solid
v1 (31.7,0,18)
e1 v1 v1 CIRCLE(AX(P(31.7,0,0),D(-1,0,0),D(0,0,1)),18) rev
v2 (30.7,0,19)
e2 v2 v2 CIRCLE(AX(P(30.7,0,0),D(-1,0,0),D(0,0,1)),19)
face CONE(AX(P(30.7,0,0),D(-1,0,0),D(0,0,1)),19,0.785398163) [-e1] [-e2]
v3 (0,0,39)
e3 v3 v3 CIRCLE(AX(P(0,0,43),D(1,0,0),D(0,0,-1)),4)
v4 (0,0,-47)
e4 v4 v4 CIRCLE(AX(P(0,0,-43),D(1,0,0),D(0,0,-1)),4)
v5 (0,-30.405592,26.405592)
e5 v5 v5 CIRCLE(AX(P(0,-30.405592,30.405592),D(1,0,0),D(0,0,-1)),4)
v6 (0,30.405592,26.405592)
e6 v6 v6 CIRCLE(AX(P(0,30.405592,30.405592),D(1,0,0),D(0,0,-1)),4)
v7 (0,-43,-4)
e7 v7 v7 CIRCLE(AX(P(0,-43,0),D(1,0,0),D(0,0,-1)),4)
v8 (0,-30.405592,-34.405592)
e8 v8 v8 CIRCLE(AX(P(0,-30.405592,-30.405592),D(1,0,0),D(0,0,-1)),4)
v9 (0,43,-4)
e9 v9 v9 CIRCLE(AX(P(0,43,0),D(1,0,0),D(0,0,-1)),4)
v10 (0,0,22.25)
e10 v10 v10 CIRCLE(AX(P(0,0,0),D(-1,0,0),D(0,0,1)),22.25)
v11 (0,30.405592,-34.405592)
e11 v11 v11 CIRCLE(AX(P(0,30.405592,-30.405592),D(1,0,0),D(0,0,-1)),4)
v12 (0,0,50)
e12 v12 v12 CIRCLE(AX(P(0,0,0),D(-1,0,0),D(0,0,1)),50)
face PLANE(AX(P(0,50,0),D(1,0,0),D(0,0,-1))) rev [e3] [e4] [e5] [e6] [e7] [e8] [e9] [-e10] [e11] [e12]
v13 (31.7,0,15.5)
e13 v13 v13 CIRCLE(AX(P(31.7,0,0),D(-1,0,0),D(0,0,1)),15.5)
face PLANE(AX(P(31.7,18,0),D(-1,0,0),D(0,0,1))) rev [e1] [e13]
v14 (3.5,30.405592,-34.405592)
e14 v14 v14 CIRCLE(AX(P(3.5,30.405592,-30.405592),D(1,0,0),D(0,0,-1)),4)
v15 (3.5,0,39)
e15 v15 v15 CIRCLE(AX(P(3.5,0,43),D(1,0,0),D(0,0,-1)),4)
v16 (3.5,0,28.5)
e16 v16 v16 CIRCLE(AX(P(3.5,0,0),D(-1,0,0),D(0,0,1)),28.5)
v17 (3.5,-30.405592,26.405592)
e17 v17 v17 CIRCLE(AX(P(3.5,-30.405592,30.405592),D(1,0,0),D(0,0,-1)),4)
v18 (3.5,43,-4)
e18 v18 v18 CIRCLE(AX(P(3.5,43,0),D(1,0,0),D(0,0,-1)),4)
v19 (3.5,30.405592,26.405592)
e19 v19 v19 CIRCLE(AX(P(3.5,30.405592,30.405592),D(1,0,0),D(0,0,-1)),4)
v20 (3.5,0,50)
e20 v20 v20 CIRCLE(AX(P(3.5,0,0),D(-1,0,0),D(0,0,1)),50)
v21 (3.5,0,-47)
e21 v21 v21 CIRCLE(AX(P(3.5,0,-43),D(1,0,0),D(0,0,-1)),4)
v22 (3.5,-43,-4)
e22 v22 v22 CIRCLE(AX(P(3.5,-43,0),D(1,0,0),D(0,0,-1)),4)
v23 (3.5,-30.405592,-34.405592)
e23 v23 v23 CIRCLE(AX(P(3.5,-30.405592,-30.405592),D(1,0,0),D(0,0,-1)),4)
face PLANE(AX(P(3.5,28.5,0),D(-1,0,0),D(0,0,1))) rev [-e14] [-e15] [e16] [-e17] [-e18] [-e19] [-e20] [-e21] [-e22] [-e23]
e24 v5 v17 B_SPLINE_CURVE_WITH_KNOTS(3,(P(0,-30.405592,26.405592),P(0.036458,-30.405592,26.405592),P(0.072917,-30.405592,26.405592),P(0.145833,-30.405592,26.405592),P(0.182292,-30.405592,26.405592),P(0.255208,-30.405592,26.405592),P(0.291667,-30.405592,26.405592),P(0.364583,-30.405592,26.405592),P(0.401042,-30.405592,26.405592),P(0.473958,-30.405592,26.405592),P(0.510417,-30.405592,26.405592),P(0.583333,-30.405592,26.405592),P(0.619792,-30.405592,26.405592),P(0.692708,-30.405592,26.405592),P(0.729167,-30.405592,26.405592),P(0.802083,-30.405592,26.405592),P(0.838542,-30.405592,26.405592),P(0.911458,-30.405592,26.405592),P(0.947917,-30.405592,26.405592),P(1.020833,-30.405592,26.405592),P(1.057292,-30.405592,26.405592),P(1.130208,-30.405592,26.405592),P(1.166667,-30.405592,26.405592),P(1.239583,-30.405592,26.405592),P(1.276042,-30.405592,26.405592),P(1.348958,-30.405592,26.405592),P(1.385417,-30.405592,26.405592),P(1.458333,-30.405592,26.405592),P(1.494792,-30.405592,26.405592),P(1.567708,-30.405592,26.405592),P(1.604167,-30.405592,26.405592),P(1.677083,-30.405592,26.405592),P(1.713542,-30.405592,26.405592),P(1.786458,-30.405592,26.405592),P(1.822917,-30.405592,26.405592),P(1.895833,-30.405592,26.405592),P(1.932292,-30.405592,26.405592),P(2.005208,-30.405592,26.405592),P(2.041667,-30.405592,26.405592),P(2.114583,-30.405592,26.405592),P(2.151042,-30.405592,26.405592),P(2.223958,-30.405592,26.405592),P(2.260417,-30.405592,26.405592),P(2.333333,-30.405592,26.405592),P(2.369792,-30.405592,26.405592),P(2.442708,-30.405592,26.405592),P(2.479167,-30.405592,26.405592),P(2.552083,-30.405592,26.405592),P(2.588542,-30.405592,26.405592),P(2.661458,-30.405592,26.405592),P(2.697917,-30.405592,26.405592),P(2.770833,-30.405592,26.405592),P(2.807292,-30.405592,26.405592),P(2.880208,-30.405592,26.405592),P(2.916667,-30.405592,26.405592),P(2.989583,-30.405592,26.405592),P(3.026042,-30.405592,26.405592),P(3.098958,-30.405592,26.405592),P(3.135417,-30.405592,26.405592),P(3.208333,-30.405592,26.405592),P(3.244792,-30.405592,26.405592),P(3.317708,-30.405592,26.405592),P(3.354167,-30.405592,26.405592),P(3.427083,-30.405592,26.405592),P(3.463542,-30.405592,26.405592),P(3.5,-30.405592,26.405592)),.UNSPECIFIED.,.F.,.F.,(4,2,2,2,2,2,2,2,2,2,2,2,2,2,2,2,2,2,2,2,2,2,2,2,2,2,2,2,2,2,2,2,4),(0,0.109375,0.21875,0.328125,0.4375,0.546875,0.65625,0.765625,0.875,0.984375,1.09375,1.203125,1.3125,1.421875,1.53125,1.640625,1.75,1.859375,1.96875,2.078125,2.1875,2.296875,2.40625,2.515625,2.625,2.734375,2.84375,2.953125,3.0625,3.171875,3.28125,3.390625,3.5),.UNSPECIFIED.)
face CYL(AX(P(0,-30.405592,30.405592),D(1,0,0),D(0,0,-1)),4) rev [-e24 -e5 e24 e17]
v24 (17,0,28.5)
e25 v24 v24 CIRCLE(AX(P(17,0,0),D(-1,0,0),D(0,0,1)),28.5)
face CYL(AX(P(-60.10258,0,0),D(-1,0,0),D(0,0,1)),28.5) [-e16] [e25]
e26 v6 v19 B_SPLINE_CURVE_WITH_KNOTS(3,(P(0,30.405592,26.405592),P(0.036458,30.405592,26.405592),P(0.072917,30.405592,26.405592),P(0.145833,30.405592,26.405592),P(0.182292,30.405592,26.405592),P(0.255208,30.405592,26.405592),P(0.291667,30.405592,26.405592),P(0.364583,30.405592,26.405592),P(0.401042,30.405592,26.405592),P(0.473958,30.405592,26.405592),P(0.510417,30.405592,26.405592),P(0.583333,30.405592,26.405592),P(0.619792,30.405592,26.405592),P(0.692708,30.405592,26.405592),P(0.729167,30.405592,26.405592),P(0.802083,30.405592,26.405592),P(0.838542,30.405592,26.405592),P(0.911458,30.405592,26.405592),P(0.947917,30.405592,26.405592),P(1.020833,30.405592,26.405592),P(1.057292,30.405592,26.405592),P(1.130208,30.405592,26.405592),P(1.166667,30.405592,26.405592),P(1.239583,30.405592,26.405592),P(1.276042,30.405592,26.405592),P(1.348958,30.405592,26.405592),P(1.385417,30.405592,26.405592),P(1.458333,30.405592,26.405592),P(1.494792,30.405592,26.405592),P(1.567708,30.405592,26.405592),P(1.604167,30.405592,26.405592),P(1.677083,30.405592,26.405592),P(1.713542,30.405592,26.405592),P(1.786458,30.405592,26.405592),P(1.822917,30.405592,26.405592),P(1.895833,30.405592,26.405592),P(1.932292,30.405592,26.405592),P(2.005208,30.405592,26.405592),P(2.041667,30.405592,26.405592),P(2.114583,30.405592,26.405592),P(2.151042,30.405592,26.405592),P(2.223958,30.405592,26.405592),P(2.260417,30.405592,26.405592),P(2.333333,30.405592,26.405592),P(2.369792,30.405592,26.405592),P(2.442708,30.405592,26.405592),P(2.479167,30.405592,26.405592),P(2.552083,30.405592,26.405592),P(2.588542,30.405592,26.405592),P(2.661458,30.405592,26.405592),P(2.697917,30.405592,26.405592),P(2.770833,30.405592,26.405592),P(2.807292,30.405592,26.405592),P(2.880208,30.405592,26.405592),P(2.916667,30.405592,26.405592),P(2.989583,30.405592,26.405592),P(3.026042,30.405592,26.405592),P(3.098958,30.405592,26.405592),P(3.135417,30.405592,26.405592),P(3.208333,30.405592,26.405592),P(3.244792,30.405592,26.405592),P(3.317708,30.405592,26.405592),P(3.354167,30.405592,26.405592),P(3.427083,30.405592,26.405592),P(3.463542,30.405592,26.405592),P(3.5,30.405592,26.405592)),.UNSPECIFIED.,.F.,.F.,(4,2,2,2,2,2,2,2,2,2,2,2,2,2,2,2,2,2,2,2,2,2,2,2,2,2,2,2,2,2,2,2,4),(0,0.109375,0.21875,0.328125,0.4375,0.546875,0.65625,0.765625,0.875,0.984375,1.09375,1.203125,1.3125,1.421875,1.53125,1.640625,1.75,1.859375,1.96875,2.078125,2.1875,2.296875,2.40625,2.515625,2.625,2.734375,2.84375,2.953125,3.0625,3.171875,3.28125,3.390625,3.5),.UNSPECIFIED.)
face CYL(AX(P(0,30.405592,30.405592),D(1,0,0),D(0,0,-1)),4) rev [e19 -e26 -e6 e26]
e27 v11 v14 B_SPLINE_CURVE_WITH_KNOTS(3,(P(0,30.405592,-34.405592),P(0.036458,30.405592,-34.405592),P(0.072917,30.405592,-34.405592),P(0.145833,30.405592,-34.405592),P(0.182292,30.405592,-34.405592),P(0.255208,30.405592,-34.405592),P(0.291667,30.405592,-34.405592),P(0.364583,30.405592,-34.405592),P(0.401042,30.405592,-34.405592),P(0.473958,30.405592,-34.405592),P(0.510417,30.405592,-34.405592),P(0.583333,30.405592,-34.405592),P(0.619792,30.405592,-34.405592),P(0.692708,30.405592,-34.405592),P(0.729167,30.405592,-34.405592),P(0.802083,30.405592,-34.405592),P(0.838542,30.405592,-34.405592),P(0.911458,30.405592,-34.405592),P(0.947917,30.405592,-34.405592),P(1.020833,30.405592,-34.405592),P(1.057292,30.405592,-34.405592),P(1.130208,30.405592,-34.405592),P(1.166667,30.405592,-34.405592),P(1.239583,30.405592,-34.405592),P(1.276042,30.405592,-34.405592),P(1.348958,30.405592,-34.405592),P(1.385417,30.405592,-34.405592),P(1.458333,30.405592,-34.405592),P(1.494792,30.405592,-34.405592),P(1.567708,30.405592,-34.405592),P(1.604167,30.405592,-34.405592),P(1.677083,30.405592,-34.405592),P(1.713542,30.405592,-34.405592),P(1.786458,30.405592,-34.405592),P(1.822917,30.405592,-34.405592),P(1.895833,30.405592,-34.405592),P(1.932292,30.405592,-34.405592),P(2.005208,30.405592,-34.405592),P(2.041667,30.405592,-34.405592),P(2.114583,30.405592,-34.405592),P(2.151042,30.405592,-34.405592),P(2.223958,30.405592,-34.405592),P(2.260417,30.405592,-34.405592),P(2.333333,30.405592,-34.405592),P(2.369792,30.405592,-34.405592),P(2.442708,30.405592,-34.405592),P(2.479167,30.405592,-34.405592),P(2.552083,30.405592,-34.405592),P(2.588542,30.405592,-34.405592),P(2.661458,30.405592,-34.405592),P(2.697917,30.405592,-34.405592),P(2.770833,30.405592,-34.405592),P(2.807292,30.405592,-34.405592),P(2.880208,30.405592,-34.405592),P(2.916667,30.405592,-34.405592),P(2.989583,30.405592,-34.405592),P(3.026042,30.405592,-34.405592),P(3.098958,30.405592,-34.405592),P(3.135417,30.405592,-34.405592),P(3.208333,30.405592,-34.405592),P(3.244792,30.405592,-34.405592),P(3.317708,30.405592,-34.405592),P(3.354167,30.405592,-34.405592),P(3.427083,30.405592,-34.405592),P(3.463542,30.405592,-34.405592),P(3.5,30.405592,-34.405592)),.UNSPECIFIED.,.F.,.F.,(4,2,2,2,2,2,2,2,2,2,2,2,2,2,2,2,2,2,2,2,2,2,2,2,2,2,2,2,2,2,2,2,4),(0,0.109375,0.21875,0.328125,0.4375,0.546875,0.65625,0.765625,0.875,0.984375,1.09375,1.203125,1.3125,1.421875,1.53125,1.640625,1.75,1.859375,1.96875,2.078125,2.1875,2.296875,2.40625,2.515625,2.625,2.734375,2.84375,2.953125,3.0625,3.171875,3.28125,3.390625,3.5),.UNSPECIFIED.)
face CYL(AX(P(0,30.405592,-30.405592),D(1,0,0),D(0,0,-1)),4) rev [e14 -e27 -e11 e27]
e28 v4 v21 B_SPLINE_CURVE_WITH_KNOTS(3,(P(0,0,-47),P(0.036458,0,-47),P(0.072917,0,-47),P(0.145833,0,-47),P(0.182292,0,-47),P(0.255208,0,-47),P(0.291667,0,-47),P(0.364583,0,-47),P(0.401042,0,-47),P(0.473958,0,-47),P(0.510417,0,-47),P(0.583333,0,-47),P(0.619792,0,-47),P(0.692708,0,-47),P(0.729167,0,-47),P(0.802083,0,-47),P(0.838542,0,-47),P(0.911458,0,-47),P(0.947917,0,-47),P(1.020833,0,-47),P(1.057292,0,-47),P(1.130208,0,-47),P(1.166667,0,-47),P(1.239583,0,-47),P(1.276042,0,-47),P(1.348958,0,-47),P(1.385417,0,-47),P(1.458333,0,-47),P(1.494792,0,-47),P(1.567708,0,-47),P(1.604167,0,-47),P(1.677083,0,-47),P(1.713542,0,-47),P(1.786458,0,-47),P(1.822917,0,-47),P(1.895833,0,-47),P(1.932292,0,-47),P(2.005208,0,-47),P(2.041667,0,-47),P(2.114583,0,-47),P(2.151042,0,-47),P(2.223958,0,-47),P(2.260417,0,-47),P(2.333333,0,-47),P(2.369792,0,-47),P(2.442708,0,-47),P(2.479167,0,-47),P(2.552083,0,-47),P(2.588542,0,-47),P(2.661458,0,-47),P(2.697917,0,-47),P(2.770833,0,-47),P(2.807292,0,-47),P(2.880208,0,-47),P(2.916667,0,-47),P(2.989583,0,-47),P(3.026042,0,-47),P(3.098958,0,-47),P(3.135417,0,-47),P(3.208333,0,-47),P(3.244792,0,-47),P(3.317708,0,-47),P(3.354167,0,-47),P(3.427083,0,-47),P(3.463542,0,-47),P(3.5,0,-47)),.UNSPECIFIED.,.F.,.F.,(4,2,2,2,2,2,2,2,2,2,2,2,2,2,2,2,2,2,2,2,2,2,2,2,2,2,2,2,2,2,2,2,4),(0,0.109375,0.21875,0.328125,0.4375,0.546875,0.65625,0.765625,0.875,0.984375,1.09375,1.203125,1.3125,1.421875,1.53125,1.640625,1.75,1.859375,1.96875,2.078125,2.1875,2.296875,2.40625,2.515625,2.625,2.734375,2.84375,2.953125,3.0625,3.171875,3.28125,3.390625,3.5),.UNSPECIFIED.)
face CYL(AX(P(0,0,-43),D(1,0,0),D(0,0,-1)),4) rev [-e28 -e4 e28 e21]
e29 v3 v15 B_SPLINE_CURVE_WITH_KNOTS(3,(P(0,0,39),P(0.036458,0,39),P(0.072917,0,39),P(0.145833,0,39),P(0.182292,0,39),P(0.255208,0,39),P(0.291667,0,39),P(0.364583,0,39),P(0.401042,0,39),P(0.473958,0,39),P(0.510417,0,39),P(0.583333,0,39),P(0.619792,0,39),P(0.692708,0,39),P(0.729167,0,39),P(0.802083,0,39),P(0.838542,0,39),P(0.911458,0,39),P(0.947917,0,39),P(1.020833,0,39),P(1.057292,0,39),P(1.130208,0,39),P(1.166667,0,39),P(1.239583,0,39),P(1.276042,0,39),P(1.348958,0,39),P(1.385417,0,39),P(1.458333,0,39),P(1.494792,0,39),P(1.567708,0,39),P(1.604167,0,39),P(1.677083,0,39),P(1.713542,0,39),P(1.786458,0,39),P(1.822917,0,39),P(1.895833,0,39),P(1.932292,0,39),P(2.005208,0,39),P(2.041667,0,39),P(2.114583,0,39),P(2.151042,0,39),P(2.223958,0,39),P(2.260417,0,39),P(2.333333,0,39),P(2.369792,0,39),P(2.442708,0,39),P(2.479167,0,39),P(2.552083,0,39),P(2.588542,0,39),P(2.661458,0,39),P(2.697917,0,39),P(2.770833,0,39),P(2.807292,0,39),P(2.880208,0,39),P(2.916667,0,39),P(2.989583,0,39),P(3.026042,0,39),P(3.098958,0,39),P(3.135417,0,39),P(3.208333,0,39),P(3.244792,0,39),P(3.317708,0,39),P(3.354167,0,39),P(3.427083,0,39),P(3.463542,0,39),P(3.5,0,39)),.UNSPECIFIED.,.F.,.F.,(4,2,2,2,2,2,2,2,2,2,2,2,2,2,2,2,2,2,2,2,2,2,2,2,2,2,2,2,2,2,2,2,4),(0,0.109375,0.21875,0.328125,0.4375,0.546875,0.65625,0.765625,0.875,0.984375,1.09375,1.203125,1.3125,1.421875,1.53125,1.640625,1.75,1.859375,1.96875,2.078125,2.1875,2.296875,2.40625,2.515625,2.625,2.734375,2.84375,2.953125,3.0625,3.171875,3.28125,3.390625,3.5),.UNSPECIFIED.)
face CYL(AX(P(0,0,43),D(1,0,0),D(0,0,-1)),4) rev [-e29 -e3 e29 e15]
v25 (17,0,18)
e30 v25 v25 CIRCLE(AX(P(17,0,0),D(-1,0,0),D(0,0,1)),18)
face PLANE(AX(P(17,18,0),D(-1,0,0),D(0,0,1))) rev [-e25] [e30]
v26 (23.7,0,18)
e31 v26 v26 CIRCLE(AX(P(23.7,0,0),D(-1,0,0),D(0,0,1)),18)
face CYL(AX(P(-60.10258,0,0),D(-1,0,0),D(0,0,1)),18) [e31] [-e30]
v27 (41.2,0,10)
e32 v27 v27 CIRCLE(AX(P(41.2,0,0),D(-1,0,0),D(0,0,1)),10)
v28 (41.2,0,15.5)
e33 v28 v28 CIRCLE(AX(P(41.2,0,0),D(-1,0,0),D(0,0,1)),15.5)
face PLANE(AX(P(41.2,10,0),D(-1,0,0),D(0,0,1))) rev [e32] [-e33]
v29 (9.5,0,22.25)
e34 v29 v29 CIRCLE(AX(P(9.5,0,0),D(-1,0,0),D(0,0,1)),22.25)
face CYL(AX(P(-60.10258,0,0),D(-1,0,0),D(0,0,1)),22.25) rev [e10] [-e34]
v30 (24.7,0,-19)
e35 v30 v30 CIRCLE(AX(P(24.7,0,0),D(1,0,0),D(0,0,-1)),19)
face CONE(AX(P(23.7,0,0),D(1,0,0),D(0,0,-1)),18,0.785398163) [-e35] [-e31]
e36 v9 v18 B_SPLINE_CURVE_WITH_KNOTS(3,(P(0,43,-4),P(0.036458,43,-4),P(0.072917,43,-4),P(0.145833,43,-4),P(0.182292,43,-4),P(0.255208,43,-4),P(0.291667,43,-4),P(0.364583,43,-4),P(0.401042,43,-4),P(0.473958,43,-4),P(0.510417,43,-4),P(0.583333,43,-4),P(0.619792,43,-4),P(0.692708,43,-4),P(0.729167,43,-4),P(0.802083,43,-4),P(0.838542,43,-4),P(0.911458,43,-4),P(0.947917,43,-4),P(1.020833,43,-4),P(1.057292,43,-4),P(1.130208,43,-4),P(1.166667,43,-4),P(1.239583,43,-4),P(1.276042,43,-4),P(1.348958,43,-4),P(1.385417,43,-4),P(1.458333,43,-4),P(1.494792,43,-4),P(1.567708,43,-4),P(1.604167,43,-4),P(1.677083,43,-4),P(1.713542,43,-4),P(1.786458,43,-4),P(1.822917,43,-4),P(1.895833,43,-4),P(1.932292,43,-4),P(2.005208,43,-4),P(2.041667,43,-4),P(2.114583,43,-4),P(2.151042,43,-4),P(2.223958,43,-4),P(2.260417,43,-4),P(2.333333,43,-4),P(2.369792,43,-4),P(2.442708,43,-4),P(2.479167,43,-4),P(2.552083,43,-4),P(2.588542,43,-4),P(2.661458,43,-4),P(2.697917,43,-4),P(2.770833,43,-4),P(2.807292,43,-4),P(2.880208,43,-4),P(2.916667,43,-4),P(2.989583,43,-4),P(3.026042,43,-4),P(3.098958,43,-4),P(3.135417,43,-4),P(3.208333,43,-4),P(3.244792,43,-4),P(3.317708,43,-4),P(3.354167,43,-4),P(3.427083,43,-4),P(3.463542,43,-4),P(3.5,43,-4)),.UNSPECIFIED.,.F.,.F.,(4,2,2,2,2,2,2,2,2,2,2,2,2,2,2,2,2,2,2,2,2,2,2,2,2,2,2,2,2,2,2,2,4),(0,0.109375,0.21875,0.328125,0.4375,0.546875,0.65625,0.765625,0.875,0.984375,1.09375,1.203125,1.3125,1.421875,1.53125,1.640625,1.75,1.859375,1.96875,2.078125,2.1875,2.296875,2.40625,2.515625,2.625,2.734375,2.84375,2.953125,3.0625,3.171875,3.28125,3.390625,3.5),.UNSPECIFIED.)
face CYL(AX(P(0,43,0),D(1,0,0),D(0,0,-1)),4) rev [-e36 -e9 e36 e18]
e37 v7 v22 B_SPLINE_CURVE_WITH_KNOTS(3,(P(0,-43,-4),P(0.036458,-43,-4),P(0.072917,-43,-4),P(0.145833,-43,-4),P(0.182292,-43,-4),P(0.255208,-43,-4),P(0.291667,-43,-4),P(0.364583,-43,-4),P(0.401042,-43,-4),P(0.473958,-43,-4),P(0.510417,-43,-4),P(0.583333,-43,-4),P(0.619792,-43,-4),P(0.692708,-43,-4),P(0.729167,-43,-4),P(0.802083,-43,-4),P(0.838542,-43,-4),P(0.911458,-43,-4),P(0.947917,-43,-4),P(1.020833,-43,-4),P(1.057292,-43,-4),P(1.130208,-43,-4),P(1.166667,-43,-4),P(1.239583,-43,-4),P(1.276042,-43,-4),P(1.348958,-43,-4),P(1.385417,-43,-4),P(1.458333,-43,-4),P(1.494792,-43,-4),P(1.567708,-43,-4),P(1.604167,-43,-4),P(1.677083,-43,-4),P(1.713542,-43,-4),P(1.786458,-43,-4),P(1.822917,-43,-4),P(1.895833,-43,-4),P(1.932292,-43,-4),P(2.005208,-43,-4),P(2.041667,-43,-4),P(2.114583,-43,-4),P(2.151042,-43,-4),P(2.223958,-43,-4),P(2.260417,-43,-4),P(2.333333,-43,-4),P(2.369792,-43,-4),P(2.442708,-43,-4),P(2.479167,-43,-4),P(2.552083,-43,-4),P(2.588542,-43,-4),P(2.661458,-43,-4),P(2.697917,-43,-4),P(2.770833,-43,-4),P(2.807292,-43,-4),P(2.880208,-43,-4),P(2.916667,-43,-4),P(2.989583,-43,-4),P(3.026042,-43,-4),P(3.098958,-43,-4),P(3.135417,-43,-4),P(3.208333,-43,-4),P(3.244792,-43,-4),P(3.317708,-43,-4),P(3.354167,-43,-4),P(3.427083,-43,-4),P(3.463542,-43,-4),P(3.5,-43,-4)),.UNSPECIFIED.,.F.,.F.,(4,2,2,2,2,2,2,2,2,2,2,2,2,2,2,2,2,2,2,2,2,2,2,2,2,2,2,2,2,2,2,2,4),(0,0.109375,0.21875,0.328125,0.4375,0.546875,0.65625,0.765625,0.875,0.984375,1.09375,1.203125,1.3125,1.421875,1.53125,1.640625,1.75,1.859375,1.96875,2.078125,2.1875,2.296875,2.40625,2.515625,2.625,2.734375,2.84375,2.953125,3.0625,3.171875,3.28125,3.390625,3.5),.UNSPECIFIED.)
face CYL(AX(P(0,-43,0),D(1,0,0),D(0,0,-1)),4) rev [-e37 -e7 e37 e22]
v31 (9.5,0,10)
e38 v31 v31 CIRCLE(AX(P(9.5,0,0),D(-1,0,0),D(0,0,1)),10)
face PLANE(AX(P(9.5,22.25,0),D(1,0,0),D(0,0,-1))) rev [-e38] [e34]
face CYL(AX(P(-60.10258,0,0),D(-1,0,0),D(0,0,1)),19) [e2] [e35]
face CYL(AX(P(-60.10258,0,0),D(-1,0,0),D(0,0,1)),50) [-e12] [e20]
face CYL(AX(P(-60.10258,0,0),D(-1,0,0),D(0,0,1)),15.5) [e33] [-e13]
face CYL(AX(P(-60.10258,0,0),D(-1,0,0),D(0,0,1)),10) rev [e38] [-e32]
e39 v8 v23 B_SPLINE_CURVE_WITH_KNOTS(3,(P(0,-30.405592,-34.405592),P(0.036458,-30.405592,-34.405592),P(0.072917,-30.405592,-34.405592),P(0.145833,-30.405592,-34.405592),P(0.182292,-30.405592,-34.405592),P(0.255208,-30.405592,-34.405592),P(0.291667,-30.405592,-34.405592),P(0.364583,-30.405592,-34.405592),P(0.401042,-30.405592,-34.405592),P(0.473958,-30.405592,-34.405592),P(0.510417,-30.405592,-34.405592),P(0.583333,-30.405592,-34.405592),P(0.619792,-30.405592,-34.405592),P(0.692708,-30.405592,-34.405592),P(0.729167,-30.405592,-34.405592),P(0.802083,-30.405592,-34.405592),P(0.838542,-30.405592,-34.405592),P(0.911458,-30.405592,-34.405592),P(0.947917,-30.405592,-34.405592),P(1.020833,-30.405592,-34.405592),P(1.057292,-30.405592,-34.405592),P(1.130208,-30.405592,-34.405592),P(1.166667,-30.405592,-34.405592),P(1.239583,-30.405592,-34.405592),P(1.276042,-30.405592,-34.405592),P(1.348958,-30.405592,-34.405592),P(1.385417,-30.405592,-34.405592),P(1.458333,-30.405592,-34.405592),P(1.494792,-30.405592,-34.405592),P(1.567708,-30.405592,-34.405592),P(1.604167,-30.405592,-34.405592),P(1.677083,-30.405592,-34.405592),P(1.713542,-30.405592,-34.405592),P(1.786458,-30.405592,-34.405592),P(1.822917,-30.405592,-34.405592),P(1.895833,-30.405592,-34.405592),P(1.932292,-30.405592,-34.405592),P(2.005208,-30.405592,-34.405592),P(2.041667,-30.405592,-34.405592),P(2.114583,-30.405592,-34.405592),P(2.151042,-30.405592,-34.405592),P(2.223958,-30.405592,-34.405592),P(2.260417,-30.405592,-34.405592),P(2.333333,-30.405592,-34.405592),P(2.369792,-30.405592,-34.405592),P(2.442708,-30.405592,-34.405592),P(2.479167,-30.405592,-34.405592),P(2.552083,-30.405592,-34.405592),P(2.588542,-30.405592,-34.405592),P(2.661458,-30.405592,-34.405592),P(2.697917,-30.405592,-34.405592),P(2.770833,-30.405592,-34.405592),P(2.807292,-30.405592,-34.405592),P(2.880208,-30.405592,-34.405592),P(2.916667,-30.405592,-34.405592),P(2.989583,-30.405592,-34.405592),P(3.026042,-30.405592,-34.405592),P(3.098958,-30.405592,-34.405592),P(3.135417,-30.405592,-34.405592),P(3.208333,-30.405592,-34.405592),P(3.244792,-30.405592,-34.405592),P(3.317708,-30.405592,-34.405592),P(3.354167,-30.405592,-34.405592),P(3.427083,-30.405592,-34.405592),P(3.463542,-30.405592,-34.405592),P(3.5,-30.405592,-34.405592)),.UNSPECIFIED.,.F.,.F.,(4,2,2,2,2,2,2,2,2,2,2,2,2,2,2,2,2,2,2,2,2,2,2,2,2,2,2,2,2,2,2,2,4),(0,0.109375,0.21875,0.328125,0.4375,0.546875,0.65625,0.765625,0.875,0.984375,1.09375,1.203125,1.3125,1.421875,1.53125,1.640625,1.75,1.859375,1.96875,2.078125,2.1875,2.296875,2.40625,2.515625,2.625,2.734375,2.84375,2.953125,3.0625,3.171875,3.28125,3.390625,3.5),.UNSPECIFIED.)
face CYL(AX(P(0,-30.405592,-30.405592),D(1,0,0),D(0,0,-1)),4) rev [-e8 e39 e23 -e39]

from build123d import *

# Parameters (mm, degrees)
CROQUIS2_R            = 4
CORTAR_EXTRUIR1_DEPTH = 81.132952023
CHAFL_N1_SIZE         = 1


with BuildPart() as part:
    # Croquis1 → Revolución1 (revolve)
    with BuildSketch(Plane.XY, mode=Mode.PRIVATE) as revoluci_n1_sk:
        Polygon((0, 22.25), (9.5, 22.25), (9.5, 10), (41.2, 10), (41.2, 15.5), (31.7, 15.5), (31.7, 18), (31.7, 19), (23.7, 19), (23.7, 18), (17, 18), (17, 28.5), (3.5, 28.5), (3.5, 50), (0, 50), align=None)
    revolve(revoluci_n1_sk.sketch.rotate(Axis((-60.102579917, 0, 0), (1, 0, 0)), 90), axis=Axis((-60.102579917, 0, 0), (1, 0, 0)))

    # Croquis2 → Cortar-Extruir1 (cut, through all)
    with BuildSketch(Plane(origin=(3.5, 0, 0), x_dir=(0, 0, -1), z_dir=(1, 0, 0))):
        with Locations((0, 43)):
            Circle(CROQUIS2_R)
        with Locations((30.405591591, 30.405591591)):
            Circle(CROQUIS2_R)
        with Locations((43, 0)):
            Circle(CROQUIS2_R)
        with Locations((30.405591591, -30.405591591)):
            Circle(CROQUIS2_R)
        with Locations((0, -43)):
            Circle(CROQUIS2_R)
        with Locations((-30.405591591, -30.405591591)):
            Circle(CROQUIS2_R)
        with Locations((-43, 0)):
            Circle(CROQUIS2_R)
        with Locations((-30.405591591, 30.405591591)):
            Circle(CROQUIS2_R)
    extrude(amount=-CORTAR_EXTRUIR1_DEPTH, mode=Mode.SUBTRACT)

    # Chaflán1
    chafl_n1_edges = [part.edges().sort_by_distance(p)[0] for p in [
        (23.7, 0, -19),
        (31.7, 0, -19),
    ]]
    chamfer(chafl_n1_edges, length=CHAFL_N1_SIZE - 0.0001)  # a hair under: the kernel refuses the full size


solid = part.part
